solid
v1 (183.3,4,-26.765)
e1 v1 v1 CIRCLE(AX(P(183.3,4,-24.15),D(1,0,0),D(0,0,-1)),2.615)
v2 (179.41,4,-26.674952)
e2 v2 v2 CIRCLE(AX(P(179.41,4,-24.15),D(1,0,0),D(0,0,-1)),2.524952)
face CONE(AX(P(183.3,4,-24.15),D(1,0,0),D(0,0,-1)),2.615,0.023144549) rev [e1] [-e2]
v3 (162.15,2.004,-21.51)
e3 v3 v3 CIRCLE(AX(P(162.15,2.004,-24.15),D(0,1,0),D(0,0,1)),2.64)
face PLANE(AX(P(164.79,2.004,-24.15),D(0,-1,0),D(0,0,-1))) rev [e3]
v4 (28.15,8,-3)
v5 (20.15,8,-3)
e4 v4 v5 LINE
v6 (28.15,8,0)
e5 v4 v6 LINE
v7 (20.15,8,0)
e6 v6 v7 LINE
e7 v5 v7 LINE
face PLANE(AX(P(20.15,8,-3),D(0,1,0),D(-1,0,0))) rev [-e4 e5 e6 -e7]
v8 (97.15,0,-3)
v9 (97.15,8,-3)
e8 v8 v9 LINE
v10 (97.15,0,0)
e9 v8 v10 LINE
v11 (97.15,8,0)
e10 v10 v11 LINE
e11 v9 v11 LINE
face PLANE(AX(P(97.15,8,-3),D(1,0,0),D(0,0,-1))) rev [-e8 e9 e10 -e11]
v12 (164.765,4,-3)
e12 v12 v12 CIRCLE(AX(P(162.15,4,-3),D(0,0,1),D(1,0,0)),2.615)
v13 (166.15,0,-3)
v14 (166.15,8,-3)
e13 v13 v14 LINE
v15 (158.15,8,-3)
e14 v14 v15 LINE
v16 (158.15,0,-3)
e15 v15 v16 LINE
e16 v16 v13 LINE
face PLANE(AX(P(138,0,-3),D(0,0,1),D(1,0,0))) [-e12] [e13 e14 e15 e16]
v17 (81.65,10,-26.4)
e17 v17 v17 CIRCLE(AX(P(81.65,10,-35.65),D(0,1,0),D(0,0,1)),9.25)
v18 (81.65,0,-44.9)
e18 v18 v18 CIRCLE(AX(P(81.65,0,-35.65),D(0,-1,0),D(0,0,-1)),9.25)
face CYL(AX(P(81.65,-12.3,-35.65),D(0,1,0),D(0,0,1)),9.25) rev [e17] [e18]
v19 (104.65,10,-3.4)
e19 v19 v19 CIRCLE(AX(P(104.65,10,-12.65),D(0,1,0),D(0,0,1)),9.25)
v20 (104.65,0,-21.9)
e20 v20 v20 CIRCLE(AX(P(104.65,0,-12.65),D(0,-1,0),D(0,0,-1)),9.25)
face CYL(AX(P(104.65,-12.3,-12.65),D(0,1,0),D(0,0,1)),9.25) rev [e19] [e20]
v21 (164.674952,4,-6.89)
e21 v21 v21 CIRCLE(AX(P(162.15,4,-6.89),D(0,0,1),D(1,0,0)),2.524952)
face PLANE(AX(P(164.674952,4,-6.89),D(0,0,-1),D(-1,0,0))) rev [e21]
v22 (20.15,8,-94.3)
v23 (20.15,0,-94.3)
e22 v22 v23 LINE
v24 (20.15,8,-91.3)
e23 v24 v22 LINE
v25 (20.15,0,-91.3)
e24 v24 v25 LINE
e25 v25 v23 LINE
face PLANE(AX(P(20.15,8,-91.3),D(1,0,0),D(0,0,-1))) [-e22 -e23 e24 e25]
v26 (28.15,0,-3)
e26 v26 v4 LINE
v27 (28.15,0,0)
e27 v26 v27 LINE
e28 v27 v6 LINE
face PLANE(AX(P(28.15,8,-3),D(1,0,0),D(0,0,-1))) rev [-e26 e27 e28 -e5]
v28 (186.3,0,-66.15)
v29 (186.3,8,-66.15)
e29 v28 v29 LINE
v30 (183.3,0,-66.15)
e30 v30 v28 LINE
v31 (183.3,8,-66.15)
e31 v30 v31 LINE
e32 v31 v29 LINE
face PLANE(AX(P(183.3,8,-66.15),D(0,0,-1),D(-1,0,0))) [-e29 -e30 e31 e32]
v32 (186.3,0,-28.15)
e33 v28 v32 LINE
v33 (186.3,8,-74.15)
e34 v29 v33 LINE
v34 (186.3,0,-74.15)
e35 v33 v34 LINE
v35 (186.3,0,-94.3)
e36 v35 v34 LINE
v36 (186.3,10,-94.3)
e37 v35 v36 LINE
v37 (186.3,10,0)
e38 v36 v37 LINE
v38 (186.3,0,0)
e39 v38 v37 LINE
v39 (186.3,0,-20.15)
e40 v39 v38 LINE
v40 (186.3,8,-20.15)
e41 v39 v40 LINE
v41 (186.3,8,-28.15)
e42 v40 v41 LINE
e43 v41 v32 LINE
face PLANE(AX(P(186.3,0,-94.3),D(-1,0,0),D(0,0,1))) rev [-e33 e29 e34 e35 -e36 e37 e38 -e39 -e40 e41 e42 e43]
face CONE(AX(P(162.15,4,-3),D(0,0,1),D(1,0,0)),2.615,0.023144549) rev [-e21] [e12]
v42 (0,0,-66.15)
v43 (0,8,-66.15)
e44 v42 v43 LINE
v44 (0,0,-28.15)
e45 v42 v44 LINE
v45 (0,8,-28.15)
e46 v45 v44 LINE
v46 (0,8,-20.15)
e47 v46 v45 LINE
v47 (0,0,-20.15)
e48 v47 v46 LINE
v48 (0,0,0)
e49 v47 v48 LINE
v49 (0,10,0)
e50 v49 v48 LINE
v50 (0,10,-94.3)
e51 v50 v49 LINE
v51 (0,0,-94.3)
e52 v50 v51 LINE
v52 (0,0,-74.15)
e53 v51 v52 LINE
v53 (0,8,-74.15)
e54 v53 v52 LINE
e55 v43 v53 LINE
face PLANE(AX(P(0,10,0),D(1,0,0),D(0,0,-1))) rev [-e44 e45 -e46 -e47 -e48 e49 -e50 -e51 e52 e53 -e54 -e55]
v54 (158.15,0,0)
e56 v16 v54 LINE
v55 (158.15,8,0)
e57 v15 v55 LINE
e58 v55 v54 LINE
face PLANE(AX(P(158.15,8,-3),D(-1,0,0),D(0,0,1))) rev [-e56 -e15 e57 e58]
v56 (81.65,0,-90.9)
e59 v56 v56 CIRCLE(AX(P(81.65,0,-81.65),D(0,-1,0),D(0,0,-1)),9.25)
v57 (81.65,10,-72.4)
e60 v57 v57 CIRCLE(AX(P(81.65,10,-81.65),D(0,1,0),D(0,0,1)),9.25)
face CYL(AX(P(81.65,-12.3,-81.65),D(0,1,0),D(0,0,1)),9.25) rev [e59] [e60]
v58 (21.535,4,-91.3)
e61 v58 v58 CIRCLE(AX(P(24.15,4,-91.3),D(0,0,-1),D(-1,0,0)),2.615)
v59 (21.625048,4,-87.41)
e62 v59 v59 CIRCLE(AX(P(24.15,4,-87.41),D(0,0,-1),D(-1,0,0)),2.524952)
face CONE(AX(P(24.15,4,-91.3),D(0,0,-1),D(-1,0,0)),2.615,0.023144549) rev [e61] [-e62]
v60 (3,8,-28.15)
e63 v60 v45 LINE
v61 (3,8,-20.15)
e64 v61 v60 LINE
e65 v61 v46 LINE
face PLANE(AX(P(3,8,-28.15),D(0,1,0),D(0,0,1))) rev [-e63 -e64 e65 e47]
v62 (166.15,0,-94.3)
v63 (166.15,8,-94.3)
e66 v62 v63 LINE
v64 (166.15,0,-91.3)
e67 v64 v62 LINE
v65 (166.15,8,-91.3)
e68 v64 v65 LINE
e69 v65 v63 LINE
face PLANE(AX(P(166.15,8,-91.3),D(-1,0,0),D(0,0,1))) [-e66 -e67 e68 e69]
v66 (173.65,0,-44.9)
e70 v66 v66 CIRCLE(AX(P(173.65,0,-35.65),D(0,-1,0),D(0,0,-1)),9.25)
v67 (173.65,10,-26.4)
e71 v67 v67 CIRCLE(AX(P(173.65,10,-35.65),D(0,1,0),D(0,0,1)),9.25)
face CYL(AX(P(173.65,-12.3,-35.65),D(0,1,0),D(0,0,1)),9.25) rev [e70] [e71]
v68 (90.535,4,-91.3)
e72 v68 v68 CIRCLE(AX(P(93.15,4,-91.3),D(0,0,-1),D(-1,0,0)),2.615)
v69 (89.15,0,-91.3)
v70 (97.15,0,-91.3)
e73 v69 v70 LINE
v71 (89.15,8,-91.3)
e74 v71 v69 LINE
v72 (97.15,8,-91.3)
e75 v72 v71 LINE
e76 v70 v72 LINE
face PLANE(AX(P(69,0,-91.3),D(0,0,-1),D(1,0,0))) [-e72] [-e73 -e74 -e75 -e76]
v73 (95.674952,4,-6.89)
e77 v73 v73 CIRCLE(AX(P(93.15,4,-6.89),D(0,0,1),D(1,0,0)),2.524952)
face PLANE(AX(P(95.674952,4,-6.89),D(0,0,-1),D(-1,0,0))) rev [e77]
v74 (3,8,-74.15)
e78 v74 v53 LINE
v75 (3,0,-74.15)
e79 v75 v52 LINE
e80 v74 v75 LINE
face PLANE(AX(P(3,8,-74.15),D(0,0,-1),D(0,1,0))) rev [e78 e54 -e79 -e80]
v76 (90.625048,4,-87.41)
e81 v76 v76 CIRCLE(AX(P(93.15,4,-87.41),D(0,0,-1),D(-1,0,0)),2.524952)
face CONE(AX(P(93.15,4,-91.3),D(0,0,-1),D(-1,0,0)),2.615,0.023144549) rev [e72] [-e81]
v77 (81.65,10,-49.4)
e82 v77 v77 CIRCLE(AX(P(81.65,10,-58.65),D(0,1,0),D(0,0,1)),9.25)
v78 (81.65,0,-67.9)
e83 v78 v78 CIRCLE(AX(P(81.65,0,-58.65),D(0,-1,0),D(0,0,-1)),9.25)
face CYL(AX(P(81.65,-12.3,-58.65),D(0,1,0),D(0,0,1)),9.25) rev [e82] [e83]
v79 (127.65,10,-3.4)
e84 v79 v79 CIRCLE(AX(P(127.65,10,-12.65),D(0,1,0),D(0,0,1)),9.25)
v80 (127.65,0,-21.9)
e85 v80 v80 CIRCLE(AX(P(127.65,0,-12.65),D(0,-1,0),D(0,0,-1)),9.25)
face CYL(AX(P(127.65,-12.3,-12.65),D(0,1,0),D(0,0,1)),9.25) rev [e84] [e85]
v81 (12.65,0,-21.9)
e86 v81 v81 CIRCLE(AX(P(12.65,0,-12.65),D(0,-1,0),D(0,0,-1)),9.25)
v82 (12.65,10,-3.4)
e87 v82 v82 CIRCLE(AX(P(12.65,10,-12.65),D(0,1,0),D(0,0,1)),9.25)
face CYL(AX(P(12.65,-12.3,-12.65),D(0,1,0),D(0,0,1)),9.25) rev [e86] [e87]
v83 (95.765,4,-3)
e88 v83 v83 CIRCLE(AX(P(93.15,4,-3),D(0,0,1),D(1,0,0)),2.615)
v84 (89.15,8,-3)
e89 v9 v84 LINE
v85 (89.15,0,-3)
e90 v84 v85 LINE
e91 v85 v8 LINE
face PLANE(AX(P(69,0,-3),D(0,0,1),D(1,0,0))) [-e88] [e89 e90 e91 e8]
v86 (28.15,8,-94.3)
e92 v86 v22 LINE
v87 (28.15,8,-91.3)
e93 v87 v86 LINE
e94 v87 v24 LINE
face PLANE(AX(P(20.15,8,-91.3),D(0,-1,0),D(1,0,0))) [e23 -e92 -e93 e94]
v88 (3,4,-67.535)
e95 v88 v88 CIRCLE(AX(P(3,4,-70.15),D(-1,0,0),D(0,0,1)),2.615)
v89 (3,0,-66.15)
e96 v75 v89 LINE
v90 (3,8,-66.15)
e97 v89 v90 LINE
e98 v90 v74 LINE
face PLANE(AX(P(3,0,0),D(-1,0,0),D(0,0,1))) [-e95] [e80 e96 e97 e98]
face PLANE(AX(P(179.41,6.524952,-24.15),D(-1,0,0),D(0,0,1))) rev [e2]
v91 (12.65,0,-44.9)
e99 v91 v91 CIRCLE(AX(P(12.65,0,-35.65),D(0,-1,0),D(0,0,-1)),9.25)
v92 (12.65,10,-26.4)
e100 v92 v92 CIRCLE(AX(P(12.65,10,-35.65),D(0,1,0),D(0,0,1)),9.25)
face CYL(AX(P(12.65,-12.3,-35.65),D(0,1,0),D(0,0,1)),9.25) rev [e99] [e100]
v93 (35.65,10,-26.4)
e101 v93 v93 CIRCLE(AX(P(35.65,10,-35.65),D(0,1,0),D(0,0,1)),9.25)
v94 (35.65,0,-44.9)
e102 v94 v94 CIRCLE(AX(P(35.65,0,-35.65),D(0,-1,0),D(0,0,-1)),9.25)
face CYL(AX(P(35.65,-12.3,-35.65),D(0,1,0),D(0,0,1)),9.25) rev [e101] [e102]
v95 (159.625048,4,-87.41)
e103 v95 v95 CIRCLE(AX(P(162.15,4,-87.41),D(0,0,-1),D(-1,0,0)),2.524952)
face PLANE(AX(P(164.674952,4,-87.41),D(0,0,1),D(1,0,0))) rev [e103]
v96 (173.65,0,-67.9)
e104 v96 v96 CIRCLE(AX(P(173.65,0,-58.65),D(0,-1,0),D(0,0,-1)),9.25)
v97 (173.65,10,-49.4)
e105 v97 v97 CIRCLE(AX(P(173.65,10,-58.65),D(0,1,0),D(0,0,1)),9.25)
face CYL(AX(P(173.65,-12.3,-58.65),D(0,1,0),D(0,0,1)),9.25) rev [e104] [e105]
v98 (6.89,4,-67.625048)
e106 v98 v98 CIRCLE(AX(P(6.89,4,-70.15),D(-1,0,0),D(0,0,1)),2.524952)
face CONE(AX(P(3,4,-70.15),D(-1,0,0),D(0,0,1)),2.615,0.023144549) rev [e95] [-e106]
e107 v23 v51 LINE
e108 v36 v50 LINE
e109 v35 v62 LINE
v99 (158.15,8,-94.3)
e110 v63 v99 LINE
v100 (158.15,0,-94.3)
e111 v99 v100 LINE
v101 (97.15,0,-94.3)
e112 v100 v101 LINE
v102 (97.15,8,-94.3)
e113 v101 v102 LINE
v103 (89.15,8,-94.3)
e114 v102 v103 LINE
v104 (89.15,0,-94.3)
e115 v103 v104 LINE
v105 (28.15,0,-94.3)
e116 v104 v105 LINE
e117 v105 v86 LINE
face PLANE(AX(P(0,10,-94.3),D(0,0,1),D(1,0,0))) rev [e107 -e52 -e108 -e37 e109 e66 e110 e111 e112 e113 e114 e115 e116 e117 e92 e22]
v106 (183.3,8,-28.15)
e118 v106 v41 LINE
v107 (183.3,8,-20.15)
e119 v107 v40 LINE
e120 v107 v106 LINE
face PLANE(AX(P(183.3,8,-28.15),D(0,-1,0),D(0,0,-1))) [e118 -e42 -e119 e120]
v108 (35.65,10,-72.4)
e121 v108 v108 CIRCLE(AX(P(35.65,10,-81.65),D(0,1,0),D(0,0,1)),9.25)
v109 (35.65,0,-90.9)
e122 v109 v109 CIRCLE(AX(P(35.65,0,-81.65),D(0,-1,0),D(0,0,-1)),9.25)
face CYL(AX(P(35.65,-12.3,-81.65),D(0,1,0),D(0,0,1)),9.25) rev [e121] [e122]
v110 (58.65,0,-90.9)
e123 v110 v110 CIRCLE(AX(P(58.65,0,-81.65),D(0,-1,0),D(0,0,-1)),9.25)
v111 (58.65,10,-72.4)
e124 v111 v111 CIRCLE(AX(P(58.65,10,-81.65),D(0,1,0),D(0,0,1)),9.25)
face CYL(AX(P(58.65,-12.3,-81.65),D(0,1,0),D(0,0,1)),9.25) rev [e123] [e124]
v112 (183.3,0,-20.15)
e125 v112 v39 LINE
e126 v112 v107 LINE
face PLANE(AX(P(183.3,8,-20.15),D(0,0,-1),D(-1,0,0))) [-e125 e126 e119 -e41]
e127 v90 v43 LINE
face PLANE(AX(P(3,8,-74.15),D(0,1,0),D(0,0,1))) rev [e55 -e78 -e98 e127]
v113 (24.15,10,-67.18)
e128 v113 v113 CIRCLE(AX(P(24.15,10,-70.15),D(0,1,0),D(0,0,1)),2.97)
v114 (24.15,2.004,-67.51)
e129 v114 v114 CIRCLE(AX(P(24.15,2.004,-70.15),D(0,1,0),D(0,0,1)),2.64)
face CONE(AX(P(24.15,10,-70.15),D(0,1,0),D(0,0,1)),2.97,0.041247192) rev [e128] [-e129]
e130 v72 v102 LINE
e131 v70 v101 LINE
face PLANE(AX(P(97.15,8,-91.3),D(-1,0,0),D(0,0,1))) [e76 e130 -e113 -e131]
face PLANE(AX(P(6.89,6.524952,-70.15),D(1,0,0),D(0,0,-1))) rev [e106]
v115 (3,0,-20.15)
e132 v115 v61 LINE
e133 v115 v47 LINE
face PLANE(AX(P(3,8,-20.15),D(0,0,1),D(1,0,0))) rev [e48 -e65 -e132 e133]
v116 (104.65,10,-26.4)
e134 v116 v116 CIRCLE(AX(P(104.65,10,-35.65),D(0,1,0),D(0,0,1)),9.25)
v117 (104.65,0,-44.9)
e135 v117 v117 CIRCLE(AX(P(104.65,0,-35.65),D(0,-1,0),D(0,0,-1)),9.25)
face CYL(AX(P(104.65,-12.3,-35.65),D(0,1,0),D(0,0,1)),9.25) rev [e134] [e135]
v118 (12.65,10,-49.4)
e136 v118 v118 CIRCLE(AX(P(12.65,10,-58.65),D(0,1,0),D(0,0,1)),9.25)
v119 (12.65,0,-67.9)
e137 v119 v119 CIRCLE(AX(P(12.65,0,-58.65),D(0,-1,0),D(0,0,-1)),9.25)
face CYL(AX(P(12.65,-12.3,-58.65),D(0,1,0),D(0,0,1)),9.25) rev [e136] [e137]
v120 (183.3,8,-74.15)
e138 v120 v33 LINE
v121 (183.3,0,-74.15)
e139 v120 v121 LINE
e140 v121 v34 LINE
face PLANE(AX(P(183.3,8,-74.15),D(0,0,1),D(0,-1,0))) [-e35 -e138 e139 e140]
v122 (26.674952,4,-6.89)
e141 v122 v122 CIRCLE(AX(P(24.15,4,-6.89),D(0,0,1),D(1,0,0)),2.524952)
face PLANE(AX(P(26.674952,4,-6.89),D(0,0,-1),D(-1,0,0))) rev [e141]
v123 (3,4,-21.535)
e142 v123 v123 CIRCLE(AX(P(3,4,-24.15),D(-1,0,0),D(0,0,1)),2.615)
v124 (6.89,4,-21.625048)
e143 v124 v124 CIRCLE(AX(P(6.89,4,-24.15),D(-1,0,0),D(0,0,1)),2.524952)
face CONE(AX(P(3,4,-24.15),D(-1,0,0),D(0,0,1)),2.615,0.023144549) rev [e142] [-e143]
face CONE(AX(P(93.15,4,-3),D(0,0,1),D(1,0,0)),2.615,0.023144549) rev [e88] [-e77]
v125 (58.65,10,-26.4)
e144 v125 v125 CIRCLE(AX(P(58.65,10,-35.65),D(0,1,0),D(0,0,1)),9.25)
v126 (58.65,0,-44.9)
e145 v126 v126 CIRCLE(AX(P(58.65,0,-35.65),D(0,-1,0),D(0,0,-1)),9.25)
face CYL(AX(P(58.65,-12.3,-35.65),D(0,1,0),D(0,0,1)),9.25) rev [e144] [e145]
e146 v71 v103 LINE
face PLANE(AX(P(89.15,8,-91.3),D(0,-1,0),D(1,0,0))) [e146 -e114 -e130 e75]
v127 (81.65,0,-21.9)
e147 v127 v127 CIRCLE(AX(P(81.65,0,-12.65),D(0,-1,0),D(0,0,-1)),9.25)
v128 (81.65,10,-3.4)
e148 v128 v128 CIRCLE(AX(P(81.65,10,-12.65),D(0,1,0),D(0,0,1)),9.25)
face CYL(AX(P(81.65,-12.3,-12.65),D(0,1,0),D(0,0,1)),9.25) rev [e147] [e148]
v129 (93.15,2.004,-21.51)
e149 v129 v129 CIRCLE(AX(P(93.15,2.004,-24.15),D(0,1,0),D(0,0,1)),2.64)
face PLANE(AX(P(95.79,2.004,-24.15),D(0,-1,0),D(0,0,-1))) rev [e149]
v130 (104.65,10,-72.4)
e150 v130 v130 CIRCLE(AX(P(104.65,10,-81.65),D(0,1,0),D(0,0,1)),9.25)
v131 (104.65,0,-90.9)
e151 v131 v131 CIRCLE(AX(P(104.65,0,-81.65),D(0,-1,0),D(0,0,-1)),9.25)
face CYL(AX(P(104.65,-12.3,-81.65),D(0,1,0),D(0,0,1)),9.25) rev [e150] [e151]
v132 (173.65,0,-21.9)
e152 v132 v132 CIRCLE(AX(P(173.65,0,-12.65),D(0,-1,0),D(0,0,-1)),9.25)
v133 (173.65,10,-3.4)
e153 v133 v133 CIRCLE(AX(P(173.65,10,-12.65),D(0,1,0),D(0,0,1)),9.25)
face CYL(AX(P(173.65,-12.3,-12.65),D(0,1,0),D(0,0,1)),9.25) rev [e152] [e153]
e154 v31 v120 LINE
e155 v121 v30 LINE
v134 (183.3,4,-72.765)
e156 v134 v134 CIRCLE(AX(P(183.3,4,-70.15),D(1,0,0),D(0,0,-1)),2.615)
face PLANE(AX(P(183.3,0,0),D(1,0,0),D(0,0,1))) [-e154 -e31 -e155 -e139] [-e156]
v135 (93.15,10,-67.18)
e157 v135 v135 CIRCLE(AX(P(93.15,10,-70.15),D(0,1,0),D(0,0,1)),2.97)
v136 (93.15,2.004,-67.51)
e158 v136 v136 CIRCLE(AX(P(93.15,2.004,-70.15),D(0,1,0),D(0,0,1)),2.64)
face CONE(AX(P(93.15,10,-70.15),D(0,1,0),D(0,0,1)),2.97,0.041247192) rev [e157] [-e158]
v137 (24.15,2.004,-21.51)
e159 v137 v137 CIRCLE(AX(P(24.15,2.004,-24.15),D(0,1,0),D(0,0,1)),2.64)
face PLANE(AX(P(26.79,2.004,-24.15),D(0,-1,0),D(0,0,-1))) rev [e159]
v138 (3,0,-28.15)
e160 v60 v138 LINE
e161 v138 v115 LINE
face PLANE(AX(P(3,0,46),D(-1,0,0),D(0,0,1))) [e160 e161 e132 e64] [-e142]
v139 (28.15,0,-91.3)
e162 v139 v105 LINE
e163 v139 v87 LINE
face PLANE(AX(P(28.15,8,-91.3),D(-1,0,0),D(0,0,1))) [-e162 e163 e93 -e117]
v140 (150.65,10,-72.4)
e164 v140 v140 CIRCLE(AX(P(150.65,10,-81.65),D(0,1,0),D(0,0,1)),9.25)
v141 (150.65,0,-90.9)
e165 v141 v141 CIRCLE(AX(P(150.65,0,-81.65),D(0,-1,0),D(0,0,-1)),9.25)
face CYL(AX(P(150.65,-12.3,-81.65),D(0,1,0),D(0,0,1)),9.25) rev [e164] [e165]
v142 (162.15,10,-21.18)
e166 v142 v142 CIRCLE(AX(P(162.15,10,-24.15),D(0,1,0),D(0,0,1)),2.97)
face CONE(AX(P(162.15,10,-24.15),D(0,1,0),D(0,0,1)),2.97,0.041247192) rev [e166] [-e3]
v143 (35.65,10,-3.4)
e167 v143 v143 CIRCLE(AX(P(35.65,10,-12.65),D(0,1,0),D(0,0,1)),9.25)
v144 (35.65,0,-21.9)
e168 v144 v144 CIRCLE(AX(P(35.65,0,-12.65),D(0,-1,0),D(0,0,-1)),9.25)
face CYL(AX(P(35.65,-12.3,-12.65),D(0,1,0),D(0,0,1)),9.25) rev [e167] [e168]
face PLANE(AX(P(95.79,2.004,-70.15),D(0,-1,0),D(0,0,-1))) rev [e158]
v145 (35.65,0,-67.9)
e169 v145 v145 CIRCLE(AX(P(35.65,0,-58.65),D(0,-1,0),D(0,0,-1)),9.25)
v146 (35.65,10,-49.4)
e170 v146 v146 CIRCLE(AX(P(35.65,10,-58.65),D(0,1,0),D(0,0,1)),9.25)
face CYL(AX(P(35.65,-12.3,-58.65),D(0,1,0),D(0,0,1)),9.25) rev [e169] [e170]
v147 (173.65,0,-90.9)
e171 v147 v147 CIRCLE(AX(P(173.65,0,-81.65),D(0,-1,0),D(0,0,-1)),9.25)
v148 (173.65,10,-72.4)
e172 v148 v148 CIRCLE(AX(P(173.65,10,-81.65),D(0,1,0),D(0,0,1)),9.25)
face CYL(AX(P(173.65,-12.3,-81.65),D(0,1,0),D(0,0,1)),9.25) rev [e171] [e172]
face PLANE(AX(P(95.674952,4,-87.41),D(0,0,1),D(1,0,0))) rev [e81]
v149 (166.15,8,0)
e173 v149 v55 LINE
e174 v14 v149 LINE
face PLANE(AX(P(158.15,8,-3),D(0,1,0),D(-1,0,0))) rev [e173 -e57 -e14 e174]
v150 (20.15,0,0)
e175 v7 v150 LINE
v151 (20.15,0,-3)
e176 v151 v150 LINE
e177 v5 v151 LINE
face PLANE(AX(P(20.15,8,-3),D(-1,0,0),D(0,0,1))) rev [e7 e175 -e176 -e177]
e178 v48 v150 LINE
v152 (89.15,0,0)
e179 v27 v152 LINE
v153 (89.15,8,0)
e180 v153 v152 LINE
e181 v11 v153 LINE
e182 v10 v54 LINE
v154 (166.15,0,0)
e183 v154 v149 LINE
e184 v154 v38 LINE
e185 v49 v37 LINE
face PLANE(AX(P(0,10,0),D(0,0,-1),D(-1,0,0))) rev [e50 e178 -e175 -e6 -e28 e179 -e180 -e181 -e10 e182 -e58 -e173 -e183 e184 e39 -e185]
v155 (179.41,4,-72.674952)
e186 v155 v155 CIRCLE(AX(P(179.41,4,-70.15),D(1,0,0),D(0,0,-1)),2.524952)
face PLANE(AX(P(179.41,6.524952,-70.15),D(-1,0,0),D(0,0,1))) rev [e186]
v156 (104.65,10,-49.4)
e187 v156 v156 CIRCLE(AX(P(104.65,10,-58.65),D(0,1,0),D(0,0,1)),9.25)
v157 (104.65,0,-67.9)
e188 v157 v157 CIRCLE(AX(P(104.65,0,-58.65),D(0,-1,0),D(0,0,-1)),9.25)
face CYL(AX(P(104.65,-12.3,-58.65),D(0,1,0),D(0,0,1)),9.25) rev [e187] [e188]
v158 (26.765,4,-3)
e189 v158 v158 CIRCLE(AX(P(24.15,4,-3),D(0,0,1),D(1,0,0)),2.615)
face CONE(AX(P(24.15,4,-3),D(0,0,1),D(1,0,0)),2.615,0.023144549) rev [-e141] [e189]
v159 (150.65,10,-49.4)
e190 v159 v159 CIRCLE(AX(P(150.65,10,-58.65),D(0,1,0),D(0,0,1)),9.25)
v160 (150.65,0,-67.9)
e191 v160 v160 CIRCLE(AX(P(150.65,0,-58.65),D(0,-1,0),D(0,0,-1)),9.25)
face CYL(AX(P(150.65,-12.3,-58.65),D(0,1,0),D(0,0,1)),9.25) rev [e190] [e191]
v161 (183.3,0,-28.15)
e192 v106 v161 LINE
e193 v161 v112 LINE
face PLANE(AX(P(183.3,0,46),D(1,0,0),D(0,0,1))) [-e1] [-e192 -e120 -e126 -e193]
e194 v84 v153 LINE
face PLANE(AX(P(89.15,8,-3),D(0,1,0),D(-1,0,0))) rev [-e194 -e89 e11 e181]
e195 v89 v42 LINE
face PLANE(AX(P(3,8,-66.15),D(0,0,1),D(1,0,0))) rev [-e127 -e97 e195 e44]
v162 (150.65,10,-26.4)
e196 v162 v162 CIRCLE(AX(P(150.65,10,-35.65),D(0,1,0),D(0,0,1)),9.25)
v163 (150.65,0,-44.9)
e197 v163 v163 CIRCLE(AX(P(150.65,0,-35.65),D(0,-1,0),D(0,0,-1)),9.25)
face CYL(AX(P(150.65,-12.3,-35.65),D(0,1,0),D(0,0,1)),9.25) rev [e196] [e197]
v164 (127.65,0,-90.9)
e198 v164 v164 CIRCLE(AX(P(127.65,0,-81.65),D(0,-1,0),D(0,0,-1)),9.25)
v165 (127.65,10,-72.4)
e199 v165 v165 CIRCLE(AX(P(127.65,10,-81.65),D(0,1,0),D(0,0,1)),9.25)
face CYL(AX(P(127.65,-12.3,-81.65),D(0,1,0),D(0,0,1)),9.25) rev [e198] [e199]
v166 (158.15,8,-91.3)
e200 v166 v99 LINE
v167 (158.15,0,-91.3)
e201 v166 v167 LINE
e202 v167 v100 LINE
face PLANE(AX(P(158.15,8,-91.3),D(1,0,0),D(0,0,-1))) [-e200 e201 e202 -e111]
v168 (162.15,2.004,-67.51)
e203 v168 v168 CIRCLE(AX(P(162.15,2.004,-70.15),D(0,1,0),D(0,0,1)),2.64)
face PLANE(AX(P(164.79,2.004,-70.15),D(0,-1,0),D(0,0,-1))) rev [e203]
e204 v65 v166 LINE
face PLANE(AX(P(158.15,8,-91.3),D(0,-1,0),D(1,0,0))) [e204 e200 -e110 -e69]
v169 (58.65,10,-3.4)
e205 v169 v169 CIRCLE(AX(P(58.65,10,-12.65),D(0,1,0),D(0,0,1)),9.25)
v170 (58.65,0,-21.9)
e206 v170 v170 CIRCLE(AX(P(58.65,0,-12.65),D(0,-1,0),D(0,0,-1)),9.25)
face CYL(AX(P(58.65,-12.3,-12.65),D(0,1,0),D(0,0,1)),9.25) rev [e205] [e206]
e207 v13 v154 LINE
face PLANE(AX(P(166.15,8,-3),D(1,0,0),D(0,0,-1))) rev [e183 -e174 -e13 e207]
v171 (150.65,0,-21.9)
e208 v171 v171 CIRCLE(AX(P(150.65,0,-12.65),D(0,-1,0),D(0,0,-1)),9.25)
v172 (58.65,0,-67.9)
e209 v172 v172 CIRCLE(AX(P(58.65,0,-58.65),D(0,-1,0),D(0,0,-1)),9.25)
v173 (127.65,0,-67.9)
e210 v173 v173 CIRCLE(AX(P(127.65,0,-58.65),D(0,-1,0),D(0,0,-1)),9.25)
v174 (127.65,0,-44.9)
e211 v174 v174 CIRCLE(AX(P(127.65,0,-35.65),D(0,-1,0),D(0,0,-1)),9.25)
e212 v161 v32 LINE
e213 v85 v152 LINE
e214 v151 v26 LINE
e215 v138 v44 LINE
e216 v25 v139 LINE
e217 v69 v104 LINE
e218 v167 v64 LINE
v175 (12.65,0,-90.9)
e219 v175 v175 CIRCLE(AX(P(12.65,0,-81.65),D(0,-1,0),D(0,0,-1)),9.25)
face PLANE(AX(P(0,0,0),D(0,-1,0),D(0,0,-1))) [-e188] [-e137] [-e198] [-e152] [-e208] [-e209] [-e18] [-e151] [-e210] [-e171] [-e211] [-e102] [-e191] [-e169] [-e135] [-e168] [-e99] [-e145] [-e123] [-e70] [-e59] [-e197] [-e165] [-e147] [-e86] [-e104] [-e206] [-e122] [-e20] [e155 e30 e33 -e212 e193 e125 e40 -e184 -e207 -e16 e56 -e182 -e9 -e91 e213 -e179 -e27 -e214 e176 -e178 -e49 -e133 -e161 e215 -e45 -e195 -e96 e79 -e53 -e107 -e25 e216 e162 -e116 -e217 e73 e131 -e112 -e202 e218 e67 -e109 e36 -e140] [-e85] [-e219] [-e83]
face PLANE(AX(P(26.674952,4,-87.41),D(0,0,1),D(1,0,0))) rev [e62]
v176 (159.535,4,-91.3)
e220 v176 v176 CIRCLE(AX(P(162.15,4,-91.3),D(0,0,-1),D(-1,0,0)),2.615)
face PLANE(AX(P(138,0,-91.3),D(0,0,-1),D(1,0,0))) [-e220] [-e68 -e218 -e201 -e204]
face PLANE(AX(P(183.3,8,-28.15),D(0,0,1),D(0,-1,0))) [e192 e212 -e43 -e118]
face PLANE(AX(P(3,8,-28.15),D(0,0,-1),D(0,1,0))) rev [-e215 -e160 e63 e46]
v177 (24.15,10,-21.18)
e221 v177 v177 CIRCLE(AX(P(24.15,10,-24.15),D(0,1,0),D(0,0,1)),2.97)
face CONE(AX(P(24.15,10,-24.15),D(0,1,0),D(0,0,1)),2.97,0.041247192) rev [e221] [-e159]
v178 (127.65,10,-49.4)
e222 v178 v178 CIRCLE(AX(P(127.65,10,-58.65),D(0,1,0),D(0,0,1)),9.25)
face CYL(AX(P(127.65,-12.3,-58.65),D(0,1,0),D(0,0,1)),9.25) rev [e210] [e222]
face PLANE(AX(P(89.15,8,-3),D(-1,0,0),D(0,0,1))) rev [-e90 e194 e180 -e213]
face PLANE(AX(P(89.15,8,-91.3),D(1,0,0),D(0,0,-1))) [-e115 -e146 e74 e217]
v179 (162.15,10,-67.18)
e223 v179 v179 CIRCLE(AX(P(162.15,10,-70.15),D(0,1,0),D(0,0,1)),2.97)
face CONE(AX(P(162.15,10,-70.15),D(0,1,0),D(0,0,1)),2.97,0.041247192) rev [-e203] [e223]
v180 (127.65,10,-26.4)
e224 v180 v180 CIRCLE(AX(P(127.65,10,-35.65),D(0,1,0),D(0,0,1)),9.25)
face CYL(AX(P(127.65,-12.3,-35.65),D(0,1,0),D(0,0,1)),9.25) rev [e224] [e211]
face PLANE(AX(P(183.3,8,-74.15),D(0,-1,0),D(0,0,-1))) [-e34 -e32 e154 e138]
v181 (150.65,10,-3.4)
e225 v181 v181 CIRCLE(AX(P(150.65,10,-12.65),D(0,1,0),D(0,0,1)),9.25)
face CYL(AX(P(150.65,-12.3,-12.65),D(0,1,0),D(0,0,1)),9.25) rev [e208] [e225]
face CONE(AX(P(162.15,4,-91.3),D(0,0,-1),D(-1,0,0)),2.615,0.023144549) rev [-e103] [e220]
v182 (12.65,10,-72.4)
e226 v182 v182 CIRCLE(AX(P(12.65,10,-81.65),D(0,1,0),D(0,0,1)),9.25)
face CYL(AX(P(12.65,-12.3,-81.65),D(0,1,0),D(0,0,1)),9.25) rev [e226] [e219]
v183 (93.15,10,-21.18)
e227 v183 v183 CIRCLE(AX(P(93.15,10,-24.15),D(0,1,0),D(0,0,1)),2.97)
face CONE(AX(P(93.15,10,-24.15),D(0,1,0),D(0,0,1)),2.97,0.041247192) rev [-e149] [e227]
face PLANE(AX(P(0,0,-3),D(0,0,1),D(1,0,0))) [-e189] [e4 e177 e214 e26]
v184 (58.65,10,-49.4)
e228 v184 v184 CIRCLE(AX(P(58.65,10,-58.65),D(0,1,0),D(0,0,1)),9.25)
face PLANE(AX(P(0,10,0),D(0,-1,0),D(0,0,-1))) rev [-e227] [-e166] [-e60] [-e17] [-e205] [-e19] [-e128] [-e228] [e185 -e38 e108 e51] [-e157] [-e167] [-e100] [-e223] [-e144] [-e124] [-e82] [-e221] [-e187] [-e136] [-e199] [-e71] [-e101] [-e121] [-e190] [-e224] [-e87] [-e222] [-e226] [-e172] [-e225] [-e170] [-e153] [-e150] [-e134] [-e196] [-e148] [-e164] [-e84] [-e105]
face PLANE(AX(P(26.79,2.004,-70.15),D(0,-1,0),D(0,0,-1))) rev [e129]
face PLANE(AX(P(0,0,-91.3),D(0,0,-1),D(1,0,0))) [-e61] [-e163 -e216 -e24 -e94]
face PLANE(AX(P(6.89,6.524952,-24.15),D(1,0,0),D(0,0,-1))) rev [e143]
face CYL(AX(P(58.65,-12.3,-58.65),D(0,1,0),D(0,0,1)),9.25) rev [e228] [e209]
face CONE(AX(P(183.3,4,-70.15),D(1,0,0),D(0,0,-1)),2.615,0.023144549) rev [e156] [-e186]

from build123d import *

# Parameters (mm, degrees)
SKETCH1_W                 = 255.3
SKETCH1_H                 = 94.3
BOSS_EXTRUDE1_DEPTH       = 10
SKETCH2_R                 = 9.25
CUT_EXTRUDE1_DEPTH        = 22.3
LPATTERN1_COUNT           = 4
LPATTERN1_PITCH           = 23
LPATTERN1_COUNT_DIR2      = 8
LPATTERN1_PITCH_DIR2      = 23
ADVANCEDHOLE1_OUTLINE_R   = 2.640000288
ADVANCEDHOLE1_DEPTH       = 7.996
ADVANCEDHOLE1_DRAFT       = -2.36329
ADVANCEDHOLE1_2_OUTLINE_R = 2.640000288
ADVANCEDHOLE1_2_DEPTH     = 7.996
ADVANCEDHOLE1_2_DRAFT     = -2.36329
ADVANCEDHOLE1_3_OUTLINE_R = 2.640000288
ADVANCEDHOLE1_3_DEPTH     = 7.996
ADVANCEDHOLE1_3_DRAFT     = -2.36329
ADVANCEDHOLE1_4_OUTLINE_R = 2.640000288
ADVANCEDHOLE1_4_DEPTH     = 7.996
ADVANCEDHOLE1_4_DRAFT     = -2.36329
MIRROR1_COPY_1_SKETCH_R   = 2.640000288
MIRROR1_COPY_1_DEPTH      = 7.996
MIRROR1_COPY_1_DRAFT      = -2.36329
MIRROR1_COPY_2_SKETCH_R   = 2.640000288
MIRROR1_COPY_2_DEPTH      = 7.996
MIRROR1_COPY_2_DRAFT      = -2.36329
MIRROR1_COPY_3_SKETCH_R   = 2.640000288
MIRROR1_COPY_3_DEPTH      = 7.996
MIRROR1_COPY_3_DRAFT      = -2.36329
MIRROR1_COPY_4_SKETCH_R   = 2.640000288
MIRROR1_COPY_4_DEPTH      = 7.996
MIRROR1_COPY_4_DRAFT      = -2.36329
MIRROR1_COPY_5_SKETCH_R   = 2.640000288
MIRROR1_COPY_5_DEPTH      = 7.996
MIRROR1_COPY_5_DRAFT      = -2.36329
MIRROR1_COPY_6_SKETCH_R   = 2.640000288
MIRROR1_COPY_6_DEPTH      = 7.996
MIRROR1_COPY_6_DRAFT      = -2.36329
MIRROR1_COPY_7_SKETCH_R   = 2.640000288
MIRROR1_COPY_7_DEPTH      = 7.996
MIRROR1_COPY_7_DRAFT      = -2.36329
SKETCH6_W                 = 69
SKETCH6_H                 = 94.3
CUT_EXTRUDE2_DEPTH        = 273.342761975
SKETCH8_W                 = 8
SKETCH8_H                 = 8
CUT_EXTRUDE3_DEPTH        = 3
LPATTERN2_COUNT           = 3
LPATTERN2_PITCH           = 69
MIRROR2_COPY_1_SKETCH_W   = 8
MIRROR2_COPY_1_SKETCH_H   = 8
MIRROR2_COPY_1_DEPTH      = 3
MIRROR2_COPY_2_SKETCH_W   = 8
MIRROR2_COPY_2_SKETCH_H   = 8
MIRROR2_COPY_2_DEPTH      = 3
SKETCH9_W                 = 8
SKETCH9_H                 = 8
CUT_EXTRUDE4_DEPTH        = 3
LPATTERN3_COUNT           = 2
LPATTERN3_PITCH           = 46
MIRROR3_COPY_1_SKETCH_W   = 8
MIRROR3_COPY_1_SKETCH_H   = 8
MIRROR3_COPY_1_DEPTH      = 3


# Read off the part's stored shape, not the designer's step: AdvancedHole1, AdvancedHole2, AdvancedHole3
with BuildPart() as part:
    # Sketch1 → Boss-Extrude1 (new body)
    with BuildSketch(Plane(origin=(0, 0, 0), x_dir=(1, 0, 0), z_dir=(0, 1, 0))):
        with Locations((127.65, 47.15)):
            Rectangle(SKETCH1_W, SKETCH1_H)
    extrude(amount=BOSS_EXTRUDE1_DEPTH)

    # Sketch2 → Cut-Extrude1 (cut)
    with BuildSketch(Plane(origin=(0, 10, 0), x_dir=(1, 0, 0), z_dir=(0, 1, 0))):
        with Locations(Location((12.65, 12.65, 0), (0, 0, 270))):
            Circle(SKETCH2_R)
    cut_extrude1 = extrude(amount=-CUT_EXTRUDE1_DEPTH, mode=Mode.SUBTRACT)

    # LPattern1: Cut-Extrude1 4 × 8
    with Locations(*[(j * LPATTERN1_PITCH_DIR2, 0, -i * LPATTERN1_PITCH) for i in range(LPATTERN1_COUNT) for j in range(LPATTERN1_COUNT_DIR2) if (i, j) != (0, 0)]):
        add(cut_extrude1, mode=Mode.SUBTRACT)


with BuildPart() as advancedhole1_tool:
    # AdvancedHole1 outline → AdvancedHole1 (with draft: the straight prism first)
    with BuildSketch(Plane(origin=(0, 2.004, 0), x_dir=(1, 0, 0), z_dir=(0, 1, 0))):
        with Locations((162.15, 70.15)):
            Circle(ADVANCEDHOLE1_OUTLINE_R)
    extrude(amount=ADVANCEDHOLE1_DEPTH)
    # AdvancedHole1: the draft: its side faces are tilted about the plane it starts from
    advancedhole1_sides = [advancedhole1_tool.faces().sort_by_distance(p)[0] for p in [
        (159.509999712, 6.002, -70.15),
    ]]
    draft(advancedhole1_sides, Plane(origin=(0, 2.004, 0), x_dir=(1, 0, 0), z_dir=(0, 1, 0)), ADVANCEDHOLE1_DRAFT)


with BuildPart() as part_1:
    add(part.part)

    # AdvancedHole1: cut by advancedhole1_tool
    add(advancedhole1_tool.part, mode=Mode.SUBTRACT)


with BuildPart() as advancedhole1_2_tool:
    # AdvancedHole1 2 outline → AdvancedHole1 2 (with draft: the straight prism first)
    with BuildSketch(Plane(origin=(0, 2.004, 0), x_dir=(1, 0, 0), z_dir=(0, 1, 0))):
        with Locations((93.15, 70.15)):
            Circle(ADVANCEDHOLE1_2_OUTLINE_R)
    extrude(amount=ADVANCEDHOLE1_2_DEPTH)
    # AdvancedHole1 2: the draft: its side faces are tilted about the plane it starts from
    advancedhole1_2_sides = [advancedhole1_2_tool.faces().sort_by_distance(p)[0] for p in [
        (90.509999712, 6.002, -70.15),
    ]]
    draft(advancedhole1_2_sides, Plane(origin=(0, 2.004, 0), x_dir=(1, 0, 0), z_dir=(0, 1, 0)), ADVANCEDHOLE1_2_DRAFT)


with BuildPart() as part_2:
    add(part_1.part)

    # AdvancedHole1 2: cut by advancedhole1_2_tool
    add(advancedhole1_2_tool.part, mode=Mode.SUBTRACT)


with BuildPart() as advancedhole1_3_tool:
    # AdvancedHole1 3 outline → AdvancedHole1 3 (with draft: the straight prism first)
    with BuildSketch(Plane(origin=(0, 2.004, 0), x_dir=(1, 0, 0), z_dir=(0, 1, 0))):
        with Locations((24.15, 70.15)):
            Circle(ADVANCEDHOLE1_3_OUTLINE_R)
    extrude(amount=ADVANCEDHOLE1_3_DEPTH)
    # AdvancedHole1 3: the draft: its side faces are tilted about the plane it starts from
    advancedhole1_3_sides = [advancedhole1_3_tool.faces().sort_by_distance(p)[0] for p in [
        (21.509999712, 6.002, -70.15),
    ]]
    draft(advancedhole1_3_sides, Plane(origin=(0, 2.004, 0), x_dir=(1, 0, 0), z_dir=(0, 1, 0)), ADVANCEDHOLE1_3_DRAFT)


with BuildPart() as part_3:
    add(part_2.part)

    # AdvancedHole1 3: cut by advancedhole1_3_tool
    add(advancedhole1_3_tool.part, mode=Mode.SUBTRACT)


with BuildPart() as advancedhole1_4_tool:
    # AdvancedHole1 4 outline → AdvancedHole1 4 (with draft: the straight prism first)
    with BuildSketch(Plane(origin=(0, 2.004, 0), x_dir=(1, 0, 0), z_dir=(0, 1, 0))):
        with Locations((231.15, 70.15)):
            Circle(ADVANCEDHOLE1_4_OUTLINE_R)
    extrude(amount=ADVANCEDHOLE1_4_DEPTH)
    # AdvancedHole1 4: the draft: its side faces are tilted about the plane it starts from
    advancedhole1_4_sides = [advancedhole1_4_tool.faces().sort_by_distance(p)[0] for p in [
        (228.509999712, 6.002, -70.15),
    ]]
    draft(advancedhole1_4_sides, Plane(origin=(0, 2.004, 0), x_dir=(1, 0, 0), z_dir=(0, 1, 0)), ADVANCEDHOLE1_4_DRAFT)


with BuildPart() as part_4:
    add(part_3.part)

    # AdvancedHole1 4: cut by advancedhole1_4_tool
    add(advancedhole1_4_tool.part, mode=Mode.SUBTRACT)


with BuildPart() as mirror1_copy_1_tool:
    # Mirror1 copy 1 sketch → Mirror1 copy 1 (with draft: the straight prism first)
    with BuildSketch(Plane(origin=(0, 2.004, -94.3), x_dir=(1, 0, 0), z_dir=(0, 1, 0))):
        with Locations((162.15, -70.15)):
            Circle(MIRROR1_COPY_1_SKETCH_R)
    extrude(amount=MIRROR1_COPY_1_DEPTH)
    # Mirror1 copy 1: the draft: its side faces are tilted about the plane it starts from
    mirror1_copy_1_sides = [mirror1_copy_1_tool.faces().sort_by_distance(p)[0] for p in [
        (159.509999712, 6.002, -24.15),
    ]]
    draft(mirror1_copy_1_sides, Plane(origin=(0, 2.004, -94.3), x_dir=(1, 0, 0), z_dir=(0, 1, 0)), MIRROR1_COPY_1_DRAFT)


with BuildPart() as part_5:
    add(part_4.part)

    # Mirror1 copy 1: cut by mirror1_copy_1_tool
    add(mirror1_copy_1_tool.part, mode=Mode.SUBTRACT)


with BuildPart() as mirror1_copy_2_tool:
    # Mirror1 copy 2 sketch → Mirror1 copy 2 (with draft: the straight prism first)
    with BuildSketch(Plane(origin=(0, 2.004, -94.3), x_dir=(1, 0, 0), z_dir=(0, 1, 0))):
        with Locations((93.15, -70.15)):
            Circle(MIRROR1_COPY_2_SKETCH_R)
    extrude(amount=MIRROR1_COPY_2_DEPTH)
    # Mirror1 copy 2: the draft: its side faces are tilted about the plane it starts from
    mirror1_copy_2_sides = [mirror1_copy_2_tool.faces().sort_by_distance(p)[0] for p in [
        (90.509999712, 6.002, -24.15),
    ]]
    draft(mirror1_copy_2_sides, Plane(origin=(0, 2.004, -94.3), x_dir=(1, 0, 0), z_dir=(0, 1, 0)), MIRROR1_COPY_2_DRAFT)


with BuildPart() as part_6:
    add(part_5.part)

    # Mirror1 copy 2: cut by mirror1_copy_2_tool
    add(mirror1_copy_2_tool.part, mode=Mode.SUBTRACT)


with BuildPart() as mirror1_copy_3_tool:
    # Mirror1 copy 3 sketch → Mirror1 copy 3 (with draft: the straight prism first)
    with BuildSketch(Plane(origin=(0, 2.004, -94.3), x_dir=(1, 0, 0), z_dir=(0, 1, 0))):
        with Locations((24.15, -70.15)):
            Circle(MIRROR1_COPY_3_SKETCH_R)
    extrude(amount=MIRROR1_COPY_3_DEPTH)
    # Mirror1 copy 3: the draft: its side faces are tilted about the plane it starts from
    mirror1_copy_3_sides = [mirror1_copy_3_tool.faces().sort_by_distance(p)[0] for p in [
        (21.509999712, 6.002, -24.15),
    ]]
    draft(mirror1_copy_3_sides, Plane(origin=(0, 2.004, -94.3), x_dir=(1, 0, 0), z_dir=(0, 1, 0)), MIRROR1_COPY_3_DRAFT)


with BuildPart() as part_7:
    add(part_6.part)

    # Mirror1 copy 3: cut by mirror1_copy_3_tool
    add(mirror1_copy_3_tool.part, mode=Mode.SUBTRACT)


with BuildPart() as mirror1_copy_4_tool:
    # Mirror1 copy 4 sketch → Mirror1 copy 4 (with draft: the straight prism first)
    with BuildSketch(Plane(origin=(0, 2.004, -94.3), x_dir=(1, 0, 0), z_dir=(0, 1, 0))):
        with Locations((231.15, -70.15)):
            Circle(MIRROR1_COPY_4_SKETCH_R)
    extrude(amount=MIRROR1_COPY_4_DEPTH)
    # Mirror1 copy 4: the draft: its side faces are tilted about the plane it starts from
    mirror1_copy_4_sides = [mirror1_copy_4_tool.faces().sort_by_distance(p)[0] for p in [
        (228.509999712, 6.002, -24.15),
    ]]
    draft(mirror1_copy_4_sides, Plane(origin=(0, 2.004, -94.3), x_dir=(1, 0, 0), z_dir=(0, 1, 0)), MIRROR1_COPY_4_DRAFT)


with BuildPart() as part_8:
    add(part_7.part)

    # Mirror1 copy 4: cut by mirror1_copy_4_tool
    add(mirror1_copy_4_tool.part, mode=Mode.SUBTRACT)


with BuildPart() as mirror1_copy_5_tool:
    # Mirror1 copy 5 sketch → Mirror1 copy 5 (with draft: the straight prism first)
    with BuildSketch(Plane(origin=(0, 2.004, -94.3), x_dir=(1, 0, 0), z_dir=(0, 1, 0))):
        with Locations((93.15, -70.15)):
            Circle(MIRROR1_COPY_5_SKETCH_R)
    extrude(amount=MIRROR1_COPY_5_DEPTH)
    # Mirror1 copy 5: the draft: its side faces are tilted about the plane it starts from
    mirror1_copy_5_sides = [mirror1_copy_5_tool.faces().sort_by_distance(p)[0] for p in [
        (90.509999712, 6.002, -24.15),
    ]]
    draft(mirror1_copy_5_sides, Plane(origin=(0, 2.004, -94.3), x_dir=(1, 0, 0), z_dir=(0, 1, 0)), MIRROR1_COPY_5_DRAFT)


with BuildPart() as part_9:
    add(part_8.part)

    # Mirror1 copy 5: cut by mirror1_copy_5_tool
    add(mirror1_copy_5_tool.part, mode=Mode.SUBTRACT)


with BuildPart() as mirror1_copy_6_tool:
    # Mirror1 copy 6 sketch → Mirror1 copy 6 (with draft: the straight prism first)
    with BuildSketch(Plane(origin=(0, 2.004, -94.3), x_dir=(1, 0, 0), z_dir=(0, 1, 0))):
        with Locations((24.15, -70.15)):
            Circle(MIRROR1_COPY_6_SKETCH_R)
    extrude(amount=MIRROR1_COPY_6_DEPTH)
    # Mirror1 copy 6: the draft: its side faces are tilted about the plane it starts from
    mirror1_copy_6_sides = [mirror1_copy_6_tool.faces().sort_by_distance(p)[0] for p in [
        (21.509999712, 6.002, -24.15),
    ]]
    draft(mirror1_copy_6_sides, Plane(origin=(0, 2.004, -94.3), x_dir=(1, 0, 0), z_dir=(0, 1, 0)), MIRROR1_COPY_6_DRAFT)


with BuildPart() as part_10:
    add(part_9.part)

    # Mirror1 copy 6: cut by mirror1_copy_6_tool
    add(mirror1_copy_6_tool.part, mode=Mode.SUBTRACT)


with BuildPart() as mirror1_copy_7_tool:
    # Mirror1 copy 7 sketch → Mirror1 copy 7 (with draft: the straight prism first)
    with BuildSketch(Plane(origin=(0, 2.004, -94.3), x_dir=(1, 0, 0), z_dir=(0, 1, 0))):
        with Locations((231.15, -70.15)):
            Circle(MIRROR1_COPY_7_SKETCH_R)
    extrude(amount=MIRROR1_COPY_7_DEPTH)
    # Mirror1 copy 7: the draft: its side faces are tilted about the plane it starts from
    mirror1_copy_7_sides = [mirror1_copy_7_tool.faces().sort_by_distance(p)[0] for p in [
        (228.509999712, 6.002, -24.15),
    ]]
    draft(mirror1_copy_7_sides, Plane(origin=(0, 2.004, -94.3), x_dir=(1, 0, 0), z_dir=(0, 1, 0)), MIRROR1_COPY_7_DRAFT)


with BuildPart() as part_11:
    add(part_10.part)

    # Mirror1 copy 7: cut by mirror1_copy_7_tool
    add(mirror1_copy_7_tool.part, mode=Mode.SUBTRACT)

    # Sketch6 → Cut-Extrude2 (cut, through all)
    with BuildSketch(Plane(origin=(0, 10, 0), x_dir=(1, 0, 0), z_dir=(0, 1, 0))):
        with Locations((220.8, 47.15)):
            Rectangle(SKETCH6_W, SKETCH6_H)
    extrude(amount=-CUT_EXTRUDE2_DEPTH, mode=Mode.SUBTRACT)

    # Sketch8 → Cut-Extrude3 (cut)
    with BuildSketch(Plane.XY):
        with Locations((24.15, 4)):
            Rectangle(SKETCH8_W, SKETCH8_H)
    cut_extrude3 = extrude(amount=-CUT_EXTRUDE3_DEPTH, mode=Mode.SUBTRACT)

    # AdvancedHole2 outline → AdvancedHole2 (revolve, cut)
    with BuildSketch(Plane(origin=(24.15, 4, 0), x_dir=(1, 0, 0), z_dir=(0, -1, 0))):
        Polygon((0, -6.89), (2.524951623, -6.89), (2.615, -3), (0, -3), align=None)
    advancedhole2 = revolve(axis=Axis((24.15, 4, 0), (0, 0, 1)), mode=Mode.SUBTRACT)

    # LPattern2: Cut-Extrude3, AdvancedHole2 ×3
    with Locations(*[(i * LPATTERN2_PITCH, 0, 0) for i in range(1, LPATTERN2_COUNT)]):
        add(cut_extrude3, mode=Mode.SUBTRACT)
        add(advancedhole2, mode=Mode.SUBTRACT)

    # Mirror2: Cut-Extrude3, AdvancedHole2 across plane
    add(cut_extrude3.mirror(Plane.XY.offset(-47.15)), mode=Mode.SUBTRACT)
    add(advancedhole2.mirror(Plane.XY.offset(-47.15)), mode=Mode.SUBTRACT)

    # Mirror2 copy 1 sketch → Mirror2 copy 1 (cut)
    with BuildSketch(Plane(origin=(69, 0, -94.3), x_dir=(1, 0, 0), z_dir=(0, 0, -1))):
        with Locations((24.15, -4)):
            Rectangle(MIRROR2_COPY_1_SKETCH_W, MIRROR2_COPY_1_SKETCH_H)
    extrude(amount=-MIRROR2_COPY_1_DEPTH, mode=Mode.SUBTRACT)

    # Mirror2 copy 2 sketch → Mirror2 copy 2 (cut)
    with BuildSketch(Plane(origin=(138, 0, -94.3), x_dir=(1, 0, 0), z_dir=(0, 0, -1))):
        with Locations((24.15, -4)):
            Rectangle(MIRROR2_COPY_2_SKETCH_W, MIRROR2_COPY_2_SKETCH_H)
    extrude(amount=-MIRROR2_COPY_2_DEPTH, mode=Mode.SUBTRACT)

    # Mirror2 copy 3 sketch → Mirror2 copy 3 (revolve, cut)
    with BuildSketch(Plane(origin=(93.15, 4, -94.3), x_dir=(1, 0, 0), z_dir=(0, -1, 0))):
        Polygon((0, 6.89), (2.524951623, 6.89), (2.615, 3), (0, 3), align=None)
    revolve(axis=Axis((93.15, 4, -94.3), (0, 0, 1)), mode=Mode.SUBTRACT)

    # Mirror2 copy 4 sketch → Mirror2 copy 4 (revolve, cut)
    with BuildSketch(Plane(origin=(162.15, 4, -94.3), x_dir=(1, 0, 0), z_dir=(0, -1, 0))):
        Polygon((0, 6.89), (2.524951623, 6.89), (2.615, 3), (0, 3), align=None)
    revolve(axis=Axis((162.15, 4, -94.3), (0, 0, 1)), mode=Mode.SUBTRACT)

    # Sketch9 → Cut-Extrude4 (cut)
    with BuildSketch(Plane.ZY):
        with Locations((-70.15, 4)):
            Rectangle(SKETCH9_W, SKETCH9_H)
    cut_extrude4 = extrude(amount=-CUT_EXTRUDE4_DEPTH, mode=Mode.SUBTRACT)

    # AdvancedHole3 outline → AdvancedHole3 (revolve, cut)
    with BuildSketch(Plane(origin=(0, 4, -70.15), x_dir=(0, 1, 0), z_dir=(0, 0, -1))):
        Polygon((2.615, 3), (2.524951623, 6.89), (0, 6.89), (0, 3), align=None)
    advancedhole3 = revolve(axis=Axis((0, 4, -70.15), (1, 0, 0)), mode=Mode.SUBTRACT)

    # LPattern3: Cut-Extrude4, AdvancedHole3 ×2
    with Locations(*[(0, 0, i * LPATTERN3_PITCH) for i in range(1, LPATTERN3_COUNT)]):
        add(cut_extrude4, mode=Mode.SUBTRACT)
        add(advancedhole3, mode=Mode.SUBTRACT)

    # Mirror3: Cut-Extrude4, AdvancedHole3 across plane
    add(cut_extrude4.mirror(Plane(origin=(93.15, 0, 0), x_dir=(0, 0, 1), z_dir=(1, 0, 0))), mode=Mode.SUBTRACT)
    add(advancedhole3.mirror(Plane(origin=(93.15, 0, 0), x_dir=(0, 0, 1), z_dir=(1, 0, 0))), mode=Mode.SUBTRACT)

    # Mirror3 copy 1 sketch → Mirror3 copy 1 (cut)
    with BuildSketch(Plane(origin=(186.3, 0, 46), x_dir=(0, 0, 1), z_dir=(1, 0, 0))):
        with Locations((-70.15, -4)):
            Rectangle(MIRROR3_COPY_1_SKETCH_W, MIRROR3_COPY_1_SKETCH_H)
    extrude(amount=-MIRROR3_COPY_1_DEPTH, mode=Mode.SUBTRACT)

    # Mirror3 copy 2 sketch → Mirror3 copy 2 (revolve, cut)
    with BuildSketch(Plane(origin=(186.3, 4, -24.15), x_dir=(0, 1, 0), z_dir=(0, 0, -1))):
        Polygon((2.615, -3), (2.524951623, -6.89), (0, -6.89), (0, -3), align=None)
    revolve(axis=Axis((186.3, 4, -24.15), (1, 0, 0)), mode=Mode.SUBTRACT)


solid = part_11.part
